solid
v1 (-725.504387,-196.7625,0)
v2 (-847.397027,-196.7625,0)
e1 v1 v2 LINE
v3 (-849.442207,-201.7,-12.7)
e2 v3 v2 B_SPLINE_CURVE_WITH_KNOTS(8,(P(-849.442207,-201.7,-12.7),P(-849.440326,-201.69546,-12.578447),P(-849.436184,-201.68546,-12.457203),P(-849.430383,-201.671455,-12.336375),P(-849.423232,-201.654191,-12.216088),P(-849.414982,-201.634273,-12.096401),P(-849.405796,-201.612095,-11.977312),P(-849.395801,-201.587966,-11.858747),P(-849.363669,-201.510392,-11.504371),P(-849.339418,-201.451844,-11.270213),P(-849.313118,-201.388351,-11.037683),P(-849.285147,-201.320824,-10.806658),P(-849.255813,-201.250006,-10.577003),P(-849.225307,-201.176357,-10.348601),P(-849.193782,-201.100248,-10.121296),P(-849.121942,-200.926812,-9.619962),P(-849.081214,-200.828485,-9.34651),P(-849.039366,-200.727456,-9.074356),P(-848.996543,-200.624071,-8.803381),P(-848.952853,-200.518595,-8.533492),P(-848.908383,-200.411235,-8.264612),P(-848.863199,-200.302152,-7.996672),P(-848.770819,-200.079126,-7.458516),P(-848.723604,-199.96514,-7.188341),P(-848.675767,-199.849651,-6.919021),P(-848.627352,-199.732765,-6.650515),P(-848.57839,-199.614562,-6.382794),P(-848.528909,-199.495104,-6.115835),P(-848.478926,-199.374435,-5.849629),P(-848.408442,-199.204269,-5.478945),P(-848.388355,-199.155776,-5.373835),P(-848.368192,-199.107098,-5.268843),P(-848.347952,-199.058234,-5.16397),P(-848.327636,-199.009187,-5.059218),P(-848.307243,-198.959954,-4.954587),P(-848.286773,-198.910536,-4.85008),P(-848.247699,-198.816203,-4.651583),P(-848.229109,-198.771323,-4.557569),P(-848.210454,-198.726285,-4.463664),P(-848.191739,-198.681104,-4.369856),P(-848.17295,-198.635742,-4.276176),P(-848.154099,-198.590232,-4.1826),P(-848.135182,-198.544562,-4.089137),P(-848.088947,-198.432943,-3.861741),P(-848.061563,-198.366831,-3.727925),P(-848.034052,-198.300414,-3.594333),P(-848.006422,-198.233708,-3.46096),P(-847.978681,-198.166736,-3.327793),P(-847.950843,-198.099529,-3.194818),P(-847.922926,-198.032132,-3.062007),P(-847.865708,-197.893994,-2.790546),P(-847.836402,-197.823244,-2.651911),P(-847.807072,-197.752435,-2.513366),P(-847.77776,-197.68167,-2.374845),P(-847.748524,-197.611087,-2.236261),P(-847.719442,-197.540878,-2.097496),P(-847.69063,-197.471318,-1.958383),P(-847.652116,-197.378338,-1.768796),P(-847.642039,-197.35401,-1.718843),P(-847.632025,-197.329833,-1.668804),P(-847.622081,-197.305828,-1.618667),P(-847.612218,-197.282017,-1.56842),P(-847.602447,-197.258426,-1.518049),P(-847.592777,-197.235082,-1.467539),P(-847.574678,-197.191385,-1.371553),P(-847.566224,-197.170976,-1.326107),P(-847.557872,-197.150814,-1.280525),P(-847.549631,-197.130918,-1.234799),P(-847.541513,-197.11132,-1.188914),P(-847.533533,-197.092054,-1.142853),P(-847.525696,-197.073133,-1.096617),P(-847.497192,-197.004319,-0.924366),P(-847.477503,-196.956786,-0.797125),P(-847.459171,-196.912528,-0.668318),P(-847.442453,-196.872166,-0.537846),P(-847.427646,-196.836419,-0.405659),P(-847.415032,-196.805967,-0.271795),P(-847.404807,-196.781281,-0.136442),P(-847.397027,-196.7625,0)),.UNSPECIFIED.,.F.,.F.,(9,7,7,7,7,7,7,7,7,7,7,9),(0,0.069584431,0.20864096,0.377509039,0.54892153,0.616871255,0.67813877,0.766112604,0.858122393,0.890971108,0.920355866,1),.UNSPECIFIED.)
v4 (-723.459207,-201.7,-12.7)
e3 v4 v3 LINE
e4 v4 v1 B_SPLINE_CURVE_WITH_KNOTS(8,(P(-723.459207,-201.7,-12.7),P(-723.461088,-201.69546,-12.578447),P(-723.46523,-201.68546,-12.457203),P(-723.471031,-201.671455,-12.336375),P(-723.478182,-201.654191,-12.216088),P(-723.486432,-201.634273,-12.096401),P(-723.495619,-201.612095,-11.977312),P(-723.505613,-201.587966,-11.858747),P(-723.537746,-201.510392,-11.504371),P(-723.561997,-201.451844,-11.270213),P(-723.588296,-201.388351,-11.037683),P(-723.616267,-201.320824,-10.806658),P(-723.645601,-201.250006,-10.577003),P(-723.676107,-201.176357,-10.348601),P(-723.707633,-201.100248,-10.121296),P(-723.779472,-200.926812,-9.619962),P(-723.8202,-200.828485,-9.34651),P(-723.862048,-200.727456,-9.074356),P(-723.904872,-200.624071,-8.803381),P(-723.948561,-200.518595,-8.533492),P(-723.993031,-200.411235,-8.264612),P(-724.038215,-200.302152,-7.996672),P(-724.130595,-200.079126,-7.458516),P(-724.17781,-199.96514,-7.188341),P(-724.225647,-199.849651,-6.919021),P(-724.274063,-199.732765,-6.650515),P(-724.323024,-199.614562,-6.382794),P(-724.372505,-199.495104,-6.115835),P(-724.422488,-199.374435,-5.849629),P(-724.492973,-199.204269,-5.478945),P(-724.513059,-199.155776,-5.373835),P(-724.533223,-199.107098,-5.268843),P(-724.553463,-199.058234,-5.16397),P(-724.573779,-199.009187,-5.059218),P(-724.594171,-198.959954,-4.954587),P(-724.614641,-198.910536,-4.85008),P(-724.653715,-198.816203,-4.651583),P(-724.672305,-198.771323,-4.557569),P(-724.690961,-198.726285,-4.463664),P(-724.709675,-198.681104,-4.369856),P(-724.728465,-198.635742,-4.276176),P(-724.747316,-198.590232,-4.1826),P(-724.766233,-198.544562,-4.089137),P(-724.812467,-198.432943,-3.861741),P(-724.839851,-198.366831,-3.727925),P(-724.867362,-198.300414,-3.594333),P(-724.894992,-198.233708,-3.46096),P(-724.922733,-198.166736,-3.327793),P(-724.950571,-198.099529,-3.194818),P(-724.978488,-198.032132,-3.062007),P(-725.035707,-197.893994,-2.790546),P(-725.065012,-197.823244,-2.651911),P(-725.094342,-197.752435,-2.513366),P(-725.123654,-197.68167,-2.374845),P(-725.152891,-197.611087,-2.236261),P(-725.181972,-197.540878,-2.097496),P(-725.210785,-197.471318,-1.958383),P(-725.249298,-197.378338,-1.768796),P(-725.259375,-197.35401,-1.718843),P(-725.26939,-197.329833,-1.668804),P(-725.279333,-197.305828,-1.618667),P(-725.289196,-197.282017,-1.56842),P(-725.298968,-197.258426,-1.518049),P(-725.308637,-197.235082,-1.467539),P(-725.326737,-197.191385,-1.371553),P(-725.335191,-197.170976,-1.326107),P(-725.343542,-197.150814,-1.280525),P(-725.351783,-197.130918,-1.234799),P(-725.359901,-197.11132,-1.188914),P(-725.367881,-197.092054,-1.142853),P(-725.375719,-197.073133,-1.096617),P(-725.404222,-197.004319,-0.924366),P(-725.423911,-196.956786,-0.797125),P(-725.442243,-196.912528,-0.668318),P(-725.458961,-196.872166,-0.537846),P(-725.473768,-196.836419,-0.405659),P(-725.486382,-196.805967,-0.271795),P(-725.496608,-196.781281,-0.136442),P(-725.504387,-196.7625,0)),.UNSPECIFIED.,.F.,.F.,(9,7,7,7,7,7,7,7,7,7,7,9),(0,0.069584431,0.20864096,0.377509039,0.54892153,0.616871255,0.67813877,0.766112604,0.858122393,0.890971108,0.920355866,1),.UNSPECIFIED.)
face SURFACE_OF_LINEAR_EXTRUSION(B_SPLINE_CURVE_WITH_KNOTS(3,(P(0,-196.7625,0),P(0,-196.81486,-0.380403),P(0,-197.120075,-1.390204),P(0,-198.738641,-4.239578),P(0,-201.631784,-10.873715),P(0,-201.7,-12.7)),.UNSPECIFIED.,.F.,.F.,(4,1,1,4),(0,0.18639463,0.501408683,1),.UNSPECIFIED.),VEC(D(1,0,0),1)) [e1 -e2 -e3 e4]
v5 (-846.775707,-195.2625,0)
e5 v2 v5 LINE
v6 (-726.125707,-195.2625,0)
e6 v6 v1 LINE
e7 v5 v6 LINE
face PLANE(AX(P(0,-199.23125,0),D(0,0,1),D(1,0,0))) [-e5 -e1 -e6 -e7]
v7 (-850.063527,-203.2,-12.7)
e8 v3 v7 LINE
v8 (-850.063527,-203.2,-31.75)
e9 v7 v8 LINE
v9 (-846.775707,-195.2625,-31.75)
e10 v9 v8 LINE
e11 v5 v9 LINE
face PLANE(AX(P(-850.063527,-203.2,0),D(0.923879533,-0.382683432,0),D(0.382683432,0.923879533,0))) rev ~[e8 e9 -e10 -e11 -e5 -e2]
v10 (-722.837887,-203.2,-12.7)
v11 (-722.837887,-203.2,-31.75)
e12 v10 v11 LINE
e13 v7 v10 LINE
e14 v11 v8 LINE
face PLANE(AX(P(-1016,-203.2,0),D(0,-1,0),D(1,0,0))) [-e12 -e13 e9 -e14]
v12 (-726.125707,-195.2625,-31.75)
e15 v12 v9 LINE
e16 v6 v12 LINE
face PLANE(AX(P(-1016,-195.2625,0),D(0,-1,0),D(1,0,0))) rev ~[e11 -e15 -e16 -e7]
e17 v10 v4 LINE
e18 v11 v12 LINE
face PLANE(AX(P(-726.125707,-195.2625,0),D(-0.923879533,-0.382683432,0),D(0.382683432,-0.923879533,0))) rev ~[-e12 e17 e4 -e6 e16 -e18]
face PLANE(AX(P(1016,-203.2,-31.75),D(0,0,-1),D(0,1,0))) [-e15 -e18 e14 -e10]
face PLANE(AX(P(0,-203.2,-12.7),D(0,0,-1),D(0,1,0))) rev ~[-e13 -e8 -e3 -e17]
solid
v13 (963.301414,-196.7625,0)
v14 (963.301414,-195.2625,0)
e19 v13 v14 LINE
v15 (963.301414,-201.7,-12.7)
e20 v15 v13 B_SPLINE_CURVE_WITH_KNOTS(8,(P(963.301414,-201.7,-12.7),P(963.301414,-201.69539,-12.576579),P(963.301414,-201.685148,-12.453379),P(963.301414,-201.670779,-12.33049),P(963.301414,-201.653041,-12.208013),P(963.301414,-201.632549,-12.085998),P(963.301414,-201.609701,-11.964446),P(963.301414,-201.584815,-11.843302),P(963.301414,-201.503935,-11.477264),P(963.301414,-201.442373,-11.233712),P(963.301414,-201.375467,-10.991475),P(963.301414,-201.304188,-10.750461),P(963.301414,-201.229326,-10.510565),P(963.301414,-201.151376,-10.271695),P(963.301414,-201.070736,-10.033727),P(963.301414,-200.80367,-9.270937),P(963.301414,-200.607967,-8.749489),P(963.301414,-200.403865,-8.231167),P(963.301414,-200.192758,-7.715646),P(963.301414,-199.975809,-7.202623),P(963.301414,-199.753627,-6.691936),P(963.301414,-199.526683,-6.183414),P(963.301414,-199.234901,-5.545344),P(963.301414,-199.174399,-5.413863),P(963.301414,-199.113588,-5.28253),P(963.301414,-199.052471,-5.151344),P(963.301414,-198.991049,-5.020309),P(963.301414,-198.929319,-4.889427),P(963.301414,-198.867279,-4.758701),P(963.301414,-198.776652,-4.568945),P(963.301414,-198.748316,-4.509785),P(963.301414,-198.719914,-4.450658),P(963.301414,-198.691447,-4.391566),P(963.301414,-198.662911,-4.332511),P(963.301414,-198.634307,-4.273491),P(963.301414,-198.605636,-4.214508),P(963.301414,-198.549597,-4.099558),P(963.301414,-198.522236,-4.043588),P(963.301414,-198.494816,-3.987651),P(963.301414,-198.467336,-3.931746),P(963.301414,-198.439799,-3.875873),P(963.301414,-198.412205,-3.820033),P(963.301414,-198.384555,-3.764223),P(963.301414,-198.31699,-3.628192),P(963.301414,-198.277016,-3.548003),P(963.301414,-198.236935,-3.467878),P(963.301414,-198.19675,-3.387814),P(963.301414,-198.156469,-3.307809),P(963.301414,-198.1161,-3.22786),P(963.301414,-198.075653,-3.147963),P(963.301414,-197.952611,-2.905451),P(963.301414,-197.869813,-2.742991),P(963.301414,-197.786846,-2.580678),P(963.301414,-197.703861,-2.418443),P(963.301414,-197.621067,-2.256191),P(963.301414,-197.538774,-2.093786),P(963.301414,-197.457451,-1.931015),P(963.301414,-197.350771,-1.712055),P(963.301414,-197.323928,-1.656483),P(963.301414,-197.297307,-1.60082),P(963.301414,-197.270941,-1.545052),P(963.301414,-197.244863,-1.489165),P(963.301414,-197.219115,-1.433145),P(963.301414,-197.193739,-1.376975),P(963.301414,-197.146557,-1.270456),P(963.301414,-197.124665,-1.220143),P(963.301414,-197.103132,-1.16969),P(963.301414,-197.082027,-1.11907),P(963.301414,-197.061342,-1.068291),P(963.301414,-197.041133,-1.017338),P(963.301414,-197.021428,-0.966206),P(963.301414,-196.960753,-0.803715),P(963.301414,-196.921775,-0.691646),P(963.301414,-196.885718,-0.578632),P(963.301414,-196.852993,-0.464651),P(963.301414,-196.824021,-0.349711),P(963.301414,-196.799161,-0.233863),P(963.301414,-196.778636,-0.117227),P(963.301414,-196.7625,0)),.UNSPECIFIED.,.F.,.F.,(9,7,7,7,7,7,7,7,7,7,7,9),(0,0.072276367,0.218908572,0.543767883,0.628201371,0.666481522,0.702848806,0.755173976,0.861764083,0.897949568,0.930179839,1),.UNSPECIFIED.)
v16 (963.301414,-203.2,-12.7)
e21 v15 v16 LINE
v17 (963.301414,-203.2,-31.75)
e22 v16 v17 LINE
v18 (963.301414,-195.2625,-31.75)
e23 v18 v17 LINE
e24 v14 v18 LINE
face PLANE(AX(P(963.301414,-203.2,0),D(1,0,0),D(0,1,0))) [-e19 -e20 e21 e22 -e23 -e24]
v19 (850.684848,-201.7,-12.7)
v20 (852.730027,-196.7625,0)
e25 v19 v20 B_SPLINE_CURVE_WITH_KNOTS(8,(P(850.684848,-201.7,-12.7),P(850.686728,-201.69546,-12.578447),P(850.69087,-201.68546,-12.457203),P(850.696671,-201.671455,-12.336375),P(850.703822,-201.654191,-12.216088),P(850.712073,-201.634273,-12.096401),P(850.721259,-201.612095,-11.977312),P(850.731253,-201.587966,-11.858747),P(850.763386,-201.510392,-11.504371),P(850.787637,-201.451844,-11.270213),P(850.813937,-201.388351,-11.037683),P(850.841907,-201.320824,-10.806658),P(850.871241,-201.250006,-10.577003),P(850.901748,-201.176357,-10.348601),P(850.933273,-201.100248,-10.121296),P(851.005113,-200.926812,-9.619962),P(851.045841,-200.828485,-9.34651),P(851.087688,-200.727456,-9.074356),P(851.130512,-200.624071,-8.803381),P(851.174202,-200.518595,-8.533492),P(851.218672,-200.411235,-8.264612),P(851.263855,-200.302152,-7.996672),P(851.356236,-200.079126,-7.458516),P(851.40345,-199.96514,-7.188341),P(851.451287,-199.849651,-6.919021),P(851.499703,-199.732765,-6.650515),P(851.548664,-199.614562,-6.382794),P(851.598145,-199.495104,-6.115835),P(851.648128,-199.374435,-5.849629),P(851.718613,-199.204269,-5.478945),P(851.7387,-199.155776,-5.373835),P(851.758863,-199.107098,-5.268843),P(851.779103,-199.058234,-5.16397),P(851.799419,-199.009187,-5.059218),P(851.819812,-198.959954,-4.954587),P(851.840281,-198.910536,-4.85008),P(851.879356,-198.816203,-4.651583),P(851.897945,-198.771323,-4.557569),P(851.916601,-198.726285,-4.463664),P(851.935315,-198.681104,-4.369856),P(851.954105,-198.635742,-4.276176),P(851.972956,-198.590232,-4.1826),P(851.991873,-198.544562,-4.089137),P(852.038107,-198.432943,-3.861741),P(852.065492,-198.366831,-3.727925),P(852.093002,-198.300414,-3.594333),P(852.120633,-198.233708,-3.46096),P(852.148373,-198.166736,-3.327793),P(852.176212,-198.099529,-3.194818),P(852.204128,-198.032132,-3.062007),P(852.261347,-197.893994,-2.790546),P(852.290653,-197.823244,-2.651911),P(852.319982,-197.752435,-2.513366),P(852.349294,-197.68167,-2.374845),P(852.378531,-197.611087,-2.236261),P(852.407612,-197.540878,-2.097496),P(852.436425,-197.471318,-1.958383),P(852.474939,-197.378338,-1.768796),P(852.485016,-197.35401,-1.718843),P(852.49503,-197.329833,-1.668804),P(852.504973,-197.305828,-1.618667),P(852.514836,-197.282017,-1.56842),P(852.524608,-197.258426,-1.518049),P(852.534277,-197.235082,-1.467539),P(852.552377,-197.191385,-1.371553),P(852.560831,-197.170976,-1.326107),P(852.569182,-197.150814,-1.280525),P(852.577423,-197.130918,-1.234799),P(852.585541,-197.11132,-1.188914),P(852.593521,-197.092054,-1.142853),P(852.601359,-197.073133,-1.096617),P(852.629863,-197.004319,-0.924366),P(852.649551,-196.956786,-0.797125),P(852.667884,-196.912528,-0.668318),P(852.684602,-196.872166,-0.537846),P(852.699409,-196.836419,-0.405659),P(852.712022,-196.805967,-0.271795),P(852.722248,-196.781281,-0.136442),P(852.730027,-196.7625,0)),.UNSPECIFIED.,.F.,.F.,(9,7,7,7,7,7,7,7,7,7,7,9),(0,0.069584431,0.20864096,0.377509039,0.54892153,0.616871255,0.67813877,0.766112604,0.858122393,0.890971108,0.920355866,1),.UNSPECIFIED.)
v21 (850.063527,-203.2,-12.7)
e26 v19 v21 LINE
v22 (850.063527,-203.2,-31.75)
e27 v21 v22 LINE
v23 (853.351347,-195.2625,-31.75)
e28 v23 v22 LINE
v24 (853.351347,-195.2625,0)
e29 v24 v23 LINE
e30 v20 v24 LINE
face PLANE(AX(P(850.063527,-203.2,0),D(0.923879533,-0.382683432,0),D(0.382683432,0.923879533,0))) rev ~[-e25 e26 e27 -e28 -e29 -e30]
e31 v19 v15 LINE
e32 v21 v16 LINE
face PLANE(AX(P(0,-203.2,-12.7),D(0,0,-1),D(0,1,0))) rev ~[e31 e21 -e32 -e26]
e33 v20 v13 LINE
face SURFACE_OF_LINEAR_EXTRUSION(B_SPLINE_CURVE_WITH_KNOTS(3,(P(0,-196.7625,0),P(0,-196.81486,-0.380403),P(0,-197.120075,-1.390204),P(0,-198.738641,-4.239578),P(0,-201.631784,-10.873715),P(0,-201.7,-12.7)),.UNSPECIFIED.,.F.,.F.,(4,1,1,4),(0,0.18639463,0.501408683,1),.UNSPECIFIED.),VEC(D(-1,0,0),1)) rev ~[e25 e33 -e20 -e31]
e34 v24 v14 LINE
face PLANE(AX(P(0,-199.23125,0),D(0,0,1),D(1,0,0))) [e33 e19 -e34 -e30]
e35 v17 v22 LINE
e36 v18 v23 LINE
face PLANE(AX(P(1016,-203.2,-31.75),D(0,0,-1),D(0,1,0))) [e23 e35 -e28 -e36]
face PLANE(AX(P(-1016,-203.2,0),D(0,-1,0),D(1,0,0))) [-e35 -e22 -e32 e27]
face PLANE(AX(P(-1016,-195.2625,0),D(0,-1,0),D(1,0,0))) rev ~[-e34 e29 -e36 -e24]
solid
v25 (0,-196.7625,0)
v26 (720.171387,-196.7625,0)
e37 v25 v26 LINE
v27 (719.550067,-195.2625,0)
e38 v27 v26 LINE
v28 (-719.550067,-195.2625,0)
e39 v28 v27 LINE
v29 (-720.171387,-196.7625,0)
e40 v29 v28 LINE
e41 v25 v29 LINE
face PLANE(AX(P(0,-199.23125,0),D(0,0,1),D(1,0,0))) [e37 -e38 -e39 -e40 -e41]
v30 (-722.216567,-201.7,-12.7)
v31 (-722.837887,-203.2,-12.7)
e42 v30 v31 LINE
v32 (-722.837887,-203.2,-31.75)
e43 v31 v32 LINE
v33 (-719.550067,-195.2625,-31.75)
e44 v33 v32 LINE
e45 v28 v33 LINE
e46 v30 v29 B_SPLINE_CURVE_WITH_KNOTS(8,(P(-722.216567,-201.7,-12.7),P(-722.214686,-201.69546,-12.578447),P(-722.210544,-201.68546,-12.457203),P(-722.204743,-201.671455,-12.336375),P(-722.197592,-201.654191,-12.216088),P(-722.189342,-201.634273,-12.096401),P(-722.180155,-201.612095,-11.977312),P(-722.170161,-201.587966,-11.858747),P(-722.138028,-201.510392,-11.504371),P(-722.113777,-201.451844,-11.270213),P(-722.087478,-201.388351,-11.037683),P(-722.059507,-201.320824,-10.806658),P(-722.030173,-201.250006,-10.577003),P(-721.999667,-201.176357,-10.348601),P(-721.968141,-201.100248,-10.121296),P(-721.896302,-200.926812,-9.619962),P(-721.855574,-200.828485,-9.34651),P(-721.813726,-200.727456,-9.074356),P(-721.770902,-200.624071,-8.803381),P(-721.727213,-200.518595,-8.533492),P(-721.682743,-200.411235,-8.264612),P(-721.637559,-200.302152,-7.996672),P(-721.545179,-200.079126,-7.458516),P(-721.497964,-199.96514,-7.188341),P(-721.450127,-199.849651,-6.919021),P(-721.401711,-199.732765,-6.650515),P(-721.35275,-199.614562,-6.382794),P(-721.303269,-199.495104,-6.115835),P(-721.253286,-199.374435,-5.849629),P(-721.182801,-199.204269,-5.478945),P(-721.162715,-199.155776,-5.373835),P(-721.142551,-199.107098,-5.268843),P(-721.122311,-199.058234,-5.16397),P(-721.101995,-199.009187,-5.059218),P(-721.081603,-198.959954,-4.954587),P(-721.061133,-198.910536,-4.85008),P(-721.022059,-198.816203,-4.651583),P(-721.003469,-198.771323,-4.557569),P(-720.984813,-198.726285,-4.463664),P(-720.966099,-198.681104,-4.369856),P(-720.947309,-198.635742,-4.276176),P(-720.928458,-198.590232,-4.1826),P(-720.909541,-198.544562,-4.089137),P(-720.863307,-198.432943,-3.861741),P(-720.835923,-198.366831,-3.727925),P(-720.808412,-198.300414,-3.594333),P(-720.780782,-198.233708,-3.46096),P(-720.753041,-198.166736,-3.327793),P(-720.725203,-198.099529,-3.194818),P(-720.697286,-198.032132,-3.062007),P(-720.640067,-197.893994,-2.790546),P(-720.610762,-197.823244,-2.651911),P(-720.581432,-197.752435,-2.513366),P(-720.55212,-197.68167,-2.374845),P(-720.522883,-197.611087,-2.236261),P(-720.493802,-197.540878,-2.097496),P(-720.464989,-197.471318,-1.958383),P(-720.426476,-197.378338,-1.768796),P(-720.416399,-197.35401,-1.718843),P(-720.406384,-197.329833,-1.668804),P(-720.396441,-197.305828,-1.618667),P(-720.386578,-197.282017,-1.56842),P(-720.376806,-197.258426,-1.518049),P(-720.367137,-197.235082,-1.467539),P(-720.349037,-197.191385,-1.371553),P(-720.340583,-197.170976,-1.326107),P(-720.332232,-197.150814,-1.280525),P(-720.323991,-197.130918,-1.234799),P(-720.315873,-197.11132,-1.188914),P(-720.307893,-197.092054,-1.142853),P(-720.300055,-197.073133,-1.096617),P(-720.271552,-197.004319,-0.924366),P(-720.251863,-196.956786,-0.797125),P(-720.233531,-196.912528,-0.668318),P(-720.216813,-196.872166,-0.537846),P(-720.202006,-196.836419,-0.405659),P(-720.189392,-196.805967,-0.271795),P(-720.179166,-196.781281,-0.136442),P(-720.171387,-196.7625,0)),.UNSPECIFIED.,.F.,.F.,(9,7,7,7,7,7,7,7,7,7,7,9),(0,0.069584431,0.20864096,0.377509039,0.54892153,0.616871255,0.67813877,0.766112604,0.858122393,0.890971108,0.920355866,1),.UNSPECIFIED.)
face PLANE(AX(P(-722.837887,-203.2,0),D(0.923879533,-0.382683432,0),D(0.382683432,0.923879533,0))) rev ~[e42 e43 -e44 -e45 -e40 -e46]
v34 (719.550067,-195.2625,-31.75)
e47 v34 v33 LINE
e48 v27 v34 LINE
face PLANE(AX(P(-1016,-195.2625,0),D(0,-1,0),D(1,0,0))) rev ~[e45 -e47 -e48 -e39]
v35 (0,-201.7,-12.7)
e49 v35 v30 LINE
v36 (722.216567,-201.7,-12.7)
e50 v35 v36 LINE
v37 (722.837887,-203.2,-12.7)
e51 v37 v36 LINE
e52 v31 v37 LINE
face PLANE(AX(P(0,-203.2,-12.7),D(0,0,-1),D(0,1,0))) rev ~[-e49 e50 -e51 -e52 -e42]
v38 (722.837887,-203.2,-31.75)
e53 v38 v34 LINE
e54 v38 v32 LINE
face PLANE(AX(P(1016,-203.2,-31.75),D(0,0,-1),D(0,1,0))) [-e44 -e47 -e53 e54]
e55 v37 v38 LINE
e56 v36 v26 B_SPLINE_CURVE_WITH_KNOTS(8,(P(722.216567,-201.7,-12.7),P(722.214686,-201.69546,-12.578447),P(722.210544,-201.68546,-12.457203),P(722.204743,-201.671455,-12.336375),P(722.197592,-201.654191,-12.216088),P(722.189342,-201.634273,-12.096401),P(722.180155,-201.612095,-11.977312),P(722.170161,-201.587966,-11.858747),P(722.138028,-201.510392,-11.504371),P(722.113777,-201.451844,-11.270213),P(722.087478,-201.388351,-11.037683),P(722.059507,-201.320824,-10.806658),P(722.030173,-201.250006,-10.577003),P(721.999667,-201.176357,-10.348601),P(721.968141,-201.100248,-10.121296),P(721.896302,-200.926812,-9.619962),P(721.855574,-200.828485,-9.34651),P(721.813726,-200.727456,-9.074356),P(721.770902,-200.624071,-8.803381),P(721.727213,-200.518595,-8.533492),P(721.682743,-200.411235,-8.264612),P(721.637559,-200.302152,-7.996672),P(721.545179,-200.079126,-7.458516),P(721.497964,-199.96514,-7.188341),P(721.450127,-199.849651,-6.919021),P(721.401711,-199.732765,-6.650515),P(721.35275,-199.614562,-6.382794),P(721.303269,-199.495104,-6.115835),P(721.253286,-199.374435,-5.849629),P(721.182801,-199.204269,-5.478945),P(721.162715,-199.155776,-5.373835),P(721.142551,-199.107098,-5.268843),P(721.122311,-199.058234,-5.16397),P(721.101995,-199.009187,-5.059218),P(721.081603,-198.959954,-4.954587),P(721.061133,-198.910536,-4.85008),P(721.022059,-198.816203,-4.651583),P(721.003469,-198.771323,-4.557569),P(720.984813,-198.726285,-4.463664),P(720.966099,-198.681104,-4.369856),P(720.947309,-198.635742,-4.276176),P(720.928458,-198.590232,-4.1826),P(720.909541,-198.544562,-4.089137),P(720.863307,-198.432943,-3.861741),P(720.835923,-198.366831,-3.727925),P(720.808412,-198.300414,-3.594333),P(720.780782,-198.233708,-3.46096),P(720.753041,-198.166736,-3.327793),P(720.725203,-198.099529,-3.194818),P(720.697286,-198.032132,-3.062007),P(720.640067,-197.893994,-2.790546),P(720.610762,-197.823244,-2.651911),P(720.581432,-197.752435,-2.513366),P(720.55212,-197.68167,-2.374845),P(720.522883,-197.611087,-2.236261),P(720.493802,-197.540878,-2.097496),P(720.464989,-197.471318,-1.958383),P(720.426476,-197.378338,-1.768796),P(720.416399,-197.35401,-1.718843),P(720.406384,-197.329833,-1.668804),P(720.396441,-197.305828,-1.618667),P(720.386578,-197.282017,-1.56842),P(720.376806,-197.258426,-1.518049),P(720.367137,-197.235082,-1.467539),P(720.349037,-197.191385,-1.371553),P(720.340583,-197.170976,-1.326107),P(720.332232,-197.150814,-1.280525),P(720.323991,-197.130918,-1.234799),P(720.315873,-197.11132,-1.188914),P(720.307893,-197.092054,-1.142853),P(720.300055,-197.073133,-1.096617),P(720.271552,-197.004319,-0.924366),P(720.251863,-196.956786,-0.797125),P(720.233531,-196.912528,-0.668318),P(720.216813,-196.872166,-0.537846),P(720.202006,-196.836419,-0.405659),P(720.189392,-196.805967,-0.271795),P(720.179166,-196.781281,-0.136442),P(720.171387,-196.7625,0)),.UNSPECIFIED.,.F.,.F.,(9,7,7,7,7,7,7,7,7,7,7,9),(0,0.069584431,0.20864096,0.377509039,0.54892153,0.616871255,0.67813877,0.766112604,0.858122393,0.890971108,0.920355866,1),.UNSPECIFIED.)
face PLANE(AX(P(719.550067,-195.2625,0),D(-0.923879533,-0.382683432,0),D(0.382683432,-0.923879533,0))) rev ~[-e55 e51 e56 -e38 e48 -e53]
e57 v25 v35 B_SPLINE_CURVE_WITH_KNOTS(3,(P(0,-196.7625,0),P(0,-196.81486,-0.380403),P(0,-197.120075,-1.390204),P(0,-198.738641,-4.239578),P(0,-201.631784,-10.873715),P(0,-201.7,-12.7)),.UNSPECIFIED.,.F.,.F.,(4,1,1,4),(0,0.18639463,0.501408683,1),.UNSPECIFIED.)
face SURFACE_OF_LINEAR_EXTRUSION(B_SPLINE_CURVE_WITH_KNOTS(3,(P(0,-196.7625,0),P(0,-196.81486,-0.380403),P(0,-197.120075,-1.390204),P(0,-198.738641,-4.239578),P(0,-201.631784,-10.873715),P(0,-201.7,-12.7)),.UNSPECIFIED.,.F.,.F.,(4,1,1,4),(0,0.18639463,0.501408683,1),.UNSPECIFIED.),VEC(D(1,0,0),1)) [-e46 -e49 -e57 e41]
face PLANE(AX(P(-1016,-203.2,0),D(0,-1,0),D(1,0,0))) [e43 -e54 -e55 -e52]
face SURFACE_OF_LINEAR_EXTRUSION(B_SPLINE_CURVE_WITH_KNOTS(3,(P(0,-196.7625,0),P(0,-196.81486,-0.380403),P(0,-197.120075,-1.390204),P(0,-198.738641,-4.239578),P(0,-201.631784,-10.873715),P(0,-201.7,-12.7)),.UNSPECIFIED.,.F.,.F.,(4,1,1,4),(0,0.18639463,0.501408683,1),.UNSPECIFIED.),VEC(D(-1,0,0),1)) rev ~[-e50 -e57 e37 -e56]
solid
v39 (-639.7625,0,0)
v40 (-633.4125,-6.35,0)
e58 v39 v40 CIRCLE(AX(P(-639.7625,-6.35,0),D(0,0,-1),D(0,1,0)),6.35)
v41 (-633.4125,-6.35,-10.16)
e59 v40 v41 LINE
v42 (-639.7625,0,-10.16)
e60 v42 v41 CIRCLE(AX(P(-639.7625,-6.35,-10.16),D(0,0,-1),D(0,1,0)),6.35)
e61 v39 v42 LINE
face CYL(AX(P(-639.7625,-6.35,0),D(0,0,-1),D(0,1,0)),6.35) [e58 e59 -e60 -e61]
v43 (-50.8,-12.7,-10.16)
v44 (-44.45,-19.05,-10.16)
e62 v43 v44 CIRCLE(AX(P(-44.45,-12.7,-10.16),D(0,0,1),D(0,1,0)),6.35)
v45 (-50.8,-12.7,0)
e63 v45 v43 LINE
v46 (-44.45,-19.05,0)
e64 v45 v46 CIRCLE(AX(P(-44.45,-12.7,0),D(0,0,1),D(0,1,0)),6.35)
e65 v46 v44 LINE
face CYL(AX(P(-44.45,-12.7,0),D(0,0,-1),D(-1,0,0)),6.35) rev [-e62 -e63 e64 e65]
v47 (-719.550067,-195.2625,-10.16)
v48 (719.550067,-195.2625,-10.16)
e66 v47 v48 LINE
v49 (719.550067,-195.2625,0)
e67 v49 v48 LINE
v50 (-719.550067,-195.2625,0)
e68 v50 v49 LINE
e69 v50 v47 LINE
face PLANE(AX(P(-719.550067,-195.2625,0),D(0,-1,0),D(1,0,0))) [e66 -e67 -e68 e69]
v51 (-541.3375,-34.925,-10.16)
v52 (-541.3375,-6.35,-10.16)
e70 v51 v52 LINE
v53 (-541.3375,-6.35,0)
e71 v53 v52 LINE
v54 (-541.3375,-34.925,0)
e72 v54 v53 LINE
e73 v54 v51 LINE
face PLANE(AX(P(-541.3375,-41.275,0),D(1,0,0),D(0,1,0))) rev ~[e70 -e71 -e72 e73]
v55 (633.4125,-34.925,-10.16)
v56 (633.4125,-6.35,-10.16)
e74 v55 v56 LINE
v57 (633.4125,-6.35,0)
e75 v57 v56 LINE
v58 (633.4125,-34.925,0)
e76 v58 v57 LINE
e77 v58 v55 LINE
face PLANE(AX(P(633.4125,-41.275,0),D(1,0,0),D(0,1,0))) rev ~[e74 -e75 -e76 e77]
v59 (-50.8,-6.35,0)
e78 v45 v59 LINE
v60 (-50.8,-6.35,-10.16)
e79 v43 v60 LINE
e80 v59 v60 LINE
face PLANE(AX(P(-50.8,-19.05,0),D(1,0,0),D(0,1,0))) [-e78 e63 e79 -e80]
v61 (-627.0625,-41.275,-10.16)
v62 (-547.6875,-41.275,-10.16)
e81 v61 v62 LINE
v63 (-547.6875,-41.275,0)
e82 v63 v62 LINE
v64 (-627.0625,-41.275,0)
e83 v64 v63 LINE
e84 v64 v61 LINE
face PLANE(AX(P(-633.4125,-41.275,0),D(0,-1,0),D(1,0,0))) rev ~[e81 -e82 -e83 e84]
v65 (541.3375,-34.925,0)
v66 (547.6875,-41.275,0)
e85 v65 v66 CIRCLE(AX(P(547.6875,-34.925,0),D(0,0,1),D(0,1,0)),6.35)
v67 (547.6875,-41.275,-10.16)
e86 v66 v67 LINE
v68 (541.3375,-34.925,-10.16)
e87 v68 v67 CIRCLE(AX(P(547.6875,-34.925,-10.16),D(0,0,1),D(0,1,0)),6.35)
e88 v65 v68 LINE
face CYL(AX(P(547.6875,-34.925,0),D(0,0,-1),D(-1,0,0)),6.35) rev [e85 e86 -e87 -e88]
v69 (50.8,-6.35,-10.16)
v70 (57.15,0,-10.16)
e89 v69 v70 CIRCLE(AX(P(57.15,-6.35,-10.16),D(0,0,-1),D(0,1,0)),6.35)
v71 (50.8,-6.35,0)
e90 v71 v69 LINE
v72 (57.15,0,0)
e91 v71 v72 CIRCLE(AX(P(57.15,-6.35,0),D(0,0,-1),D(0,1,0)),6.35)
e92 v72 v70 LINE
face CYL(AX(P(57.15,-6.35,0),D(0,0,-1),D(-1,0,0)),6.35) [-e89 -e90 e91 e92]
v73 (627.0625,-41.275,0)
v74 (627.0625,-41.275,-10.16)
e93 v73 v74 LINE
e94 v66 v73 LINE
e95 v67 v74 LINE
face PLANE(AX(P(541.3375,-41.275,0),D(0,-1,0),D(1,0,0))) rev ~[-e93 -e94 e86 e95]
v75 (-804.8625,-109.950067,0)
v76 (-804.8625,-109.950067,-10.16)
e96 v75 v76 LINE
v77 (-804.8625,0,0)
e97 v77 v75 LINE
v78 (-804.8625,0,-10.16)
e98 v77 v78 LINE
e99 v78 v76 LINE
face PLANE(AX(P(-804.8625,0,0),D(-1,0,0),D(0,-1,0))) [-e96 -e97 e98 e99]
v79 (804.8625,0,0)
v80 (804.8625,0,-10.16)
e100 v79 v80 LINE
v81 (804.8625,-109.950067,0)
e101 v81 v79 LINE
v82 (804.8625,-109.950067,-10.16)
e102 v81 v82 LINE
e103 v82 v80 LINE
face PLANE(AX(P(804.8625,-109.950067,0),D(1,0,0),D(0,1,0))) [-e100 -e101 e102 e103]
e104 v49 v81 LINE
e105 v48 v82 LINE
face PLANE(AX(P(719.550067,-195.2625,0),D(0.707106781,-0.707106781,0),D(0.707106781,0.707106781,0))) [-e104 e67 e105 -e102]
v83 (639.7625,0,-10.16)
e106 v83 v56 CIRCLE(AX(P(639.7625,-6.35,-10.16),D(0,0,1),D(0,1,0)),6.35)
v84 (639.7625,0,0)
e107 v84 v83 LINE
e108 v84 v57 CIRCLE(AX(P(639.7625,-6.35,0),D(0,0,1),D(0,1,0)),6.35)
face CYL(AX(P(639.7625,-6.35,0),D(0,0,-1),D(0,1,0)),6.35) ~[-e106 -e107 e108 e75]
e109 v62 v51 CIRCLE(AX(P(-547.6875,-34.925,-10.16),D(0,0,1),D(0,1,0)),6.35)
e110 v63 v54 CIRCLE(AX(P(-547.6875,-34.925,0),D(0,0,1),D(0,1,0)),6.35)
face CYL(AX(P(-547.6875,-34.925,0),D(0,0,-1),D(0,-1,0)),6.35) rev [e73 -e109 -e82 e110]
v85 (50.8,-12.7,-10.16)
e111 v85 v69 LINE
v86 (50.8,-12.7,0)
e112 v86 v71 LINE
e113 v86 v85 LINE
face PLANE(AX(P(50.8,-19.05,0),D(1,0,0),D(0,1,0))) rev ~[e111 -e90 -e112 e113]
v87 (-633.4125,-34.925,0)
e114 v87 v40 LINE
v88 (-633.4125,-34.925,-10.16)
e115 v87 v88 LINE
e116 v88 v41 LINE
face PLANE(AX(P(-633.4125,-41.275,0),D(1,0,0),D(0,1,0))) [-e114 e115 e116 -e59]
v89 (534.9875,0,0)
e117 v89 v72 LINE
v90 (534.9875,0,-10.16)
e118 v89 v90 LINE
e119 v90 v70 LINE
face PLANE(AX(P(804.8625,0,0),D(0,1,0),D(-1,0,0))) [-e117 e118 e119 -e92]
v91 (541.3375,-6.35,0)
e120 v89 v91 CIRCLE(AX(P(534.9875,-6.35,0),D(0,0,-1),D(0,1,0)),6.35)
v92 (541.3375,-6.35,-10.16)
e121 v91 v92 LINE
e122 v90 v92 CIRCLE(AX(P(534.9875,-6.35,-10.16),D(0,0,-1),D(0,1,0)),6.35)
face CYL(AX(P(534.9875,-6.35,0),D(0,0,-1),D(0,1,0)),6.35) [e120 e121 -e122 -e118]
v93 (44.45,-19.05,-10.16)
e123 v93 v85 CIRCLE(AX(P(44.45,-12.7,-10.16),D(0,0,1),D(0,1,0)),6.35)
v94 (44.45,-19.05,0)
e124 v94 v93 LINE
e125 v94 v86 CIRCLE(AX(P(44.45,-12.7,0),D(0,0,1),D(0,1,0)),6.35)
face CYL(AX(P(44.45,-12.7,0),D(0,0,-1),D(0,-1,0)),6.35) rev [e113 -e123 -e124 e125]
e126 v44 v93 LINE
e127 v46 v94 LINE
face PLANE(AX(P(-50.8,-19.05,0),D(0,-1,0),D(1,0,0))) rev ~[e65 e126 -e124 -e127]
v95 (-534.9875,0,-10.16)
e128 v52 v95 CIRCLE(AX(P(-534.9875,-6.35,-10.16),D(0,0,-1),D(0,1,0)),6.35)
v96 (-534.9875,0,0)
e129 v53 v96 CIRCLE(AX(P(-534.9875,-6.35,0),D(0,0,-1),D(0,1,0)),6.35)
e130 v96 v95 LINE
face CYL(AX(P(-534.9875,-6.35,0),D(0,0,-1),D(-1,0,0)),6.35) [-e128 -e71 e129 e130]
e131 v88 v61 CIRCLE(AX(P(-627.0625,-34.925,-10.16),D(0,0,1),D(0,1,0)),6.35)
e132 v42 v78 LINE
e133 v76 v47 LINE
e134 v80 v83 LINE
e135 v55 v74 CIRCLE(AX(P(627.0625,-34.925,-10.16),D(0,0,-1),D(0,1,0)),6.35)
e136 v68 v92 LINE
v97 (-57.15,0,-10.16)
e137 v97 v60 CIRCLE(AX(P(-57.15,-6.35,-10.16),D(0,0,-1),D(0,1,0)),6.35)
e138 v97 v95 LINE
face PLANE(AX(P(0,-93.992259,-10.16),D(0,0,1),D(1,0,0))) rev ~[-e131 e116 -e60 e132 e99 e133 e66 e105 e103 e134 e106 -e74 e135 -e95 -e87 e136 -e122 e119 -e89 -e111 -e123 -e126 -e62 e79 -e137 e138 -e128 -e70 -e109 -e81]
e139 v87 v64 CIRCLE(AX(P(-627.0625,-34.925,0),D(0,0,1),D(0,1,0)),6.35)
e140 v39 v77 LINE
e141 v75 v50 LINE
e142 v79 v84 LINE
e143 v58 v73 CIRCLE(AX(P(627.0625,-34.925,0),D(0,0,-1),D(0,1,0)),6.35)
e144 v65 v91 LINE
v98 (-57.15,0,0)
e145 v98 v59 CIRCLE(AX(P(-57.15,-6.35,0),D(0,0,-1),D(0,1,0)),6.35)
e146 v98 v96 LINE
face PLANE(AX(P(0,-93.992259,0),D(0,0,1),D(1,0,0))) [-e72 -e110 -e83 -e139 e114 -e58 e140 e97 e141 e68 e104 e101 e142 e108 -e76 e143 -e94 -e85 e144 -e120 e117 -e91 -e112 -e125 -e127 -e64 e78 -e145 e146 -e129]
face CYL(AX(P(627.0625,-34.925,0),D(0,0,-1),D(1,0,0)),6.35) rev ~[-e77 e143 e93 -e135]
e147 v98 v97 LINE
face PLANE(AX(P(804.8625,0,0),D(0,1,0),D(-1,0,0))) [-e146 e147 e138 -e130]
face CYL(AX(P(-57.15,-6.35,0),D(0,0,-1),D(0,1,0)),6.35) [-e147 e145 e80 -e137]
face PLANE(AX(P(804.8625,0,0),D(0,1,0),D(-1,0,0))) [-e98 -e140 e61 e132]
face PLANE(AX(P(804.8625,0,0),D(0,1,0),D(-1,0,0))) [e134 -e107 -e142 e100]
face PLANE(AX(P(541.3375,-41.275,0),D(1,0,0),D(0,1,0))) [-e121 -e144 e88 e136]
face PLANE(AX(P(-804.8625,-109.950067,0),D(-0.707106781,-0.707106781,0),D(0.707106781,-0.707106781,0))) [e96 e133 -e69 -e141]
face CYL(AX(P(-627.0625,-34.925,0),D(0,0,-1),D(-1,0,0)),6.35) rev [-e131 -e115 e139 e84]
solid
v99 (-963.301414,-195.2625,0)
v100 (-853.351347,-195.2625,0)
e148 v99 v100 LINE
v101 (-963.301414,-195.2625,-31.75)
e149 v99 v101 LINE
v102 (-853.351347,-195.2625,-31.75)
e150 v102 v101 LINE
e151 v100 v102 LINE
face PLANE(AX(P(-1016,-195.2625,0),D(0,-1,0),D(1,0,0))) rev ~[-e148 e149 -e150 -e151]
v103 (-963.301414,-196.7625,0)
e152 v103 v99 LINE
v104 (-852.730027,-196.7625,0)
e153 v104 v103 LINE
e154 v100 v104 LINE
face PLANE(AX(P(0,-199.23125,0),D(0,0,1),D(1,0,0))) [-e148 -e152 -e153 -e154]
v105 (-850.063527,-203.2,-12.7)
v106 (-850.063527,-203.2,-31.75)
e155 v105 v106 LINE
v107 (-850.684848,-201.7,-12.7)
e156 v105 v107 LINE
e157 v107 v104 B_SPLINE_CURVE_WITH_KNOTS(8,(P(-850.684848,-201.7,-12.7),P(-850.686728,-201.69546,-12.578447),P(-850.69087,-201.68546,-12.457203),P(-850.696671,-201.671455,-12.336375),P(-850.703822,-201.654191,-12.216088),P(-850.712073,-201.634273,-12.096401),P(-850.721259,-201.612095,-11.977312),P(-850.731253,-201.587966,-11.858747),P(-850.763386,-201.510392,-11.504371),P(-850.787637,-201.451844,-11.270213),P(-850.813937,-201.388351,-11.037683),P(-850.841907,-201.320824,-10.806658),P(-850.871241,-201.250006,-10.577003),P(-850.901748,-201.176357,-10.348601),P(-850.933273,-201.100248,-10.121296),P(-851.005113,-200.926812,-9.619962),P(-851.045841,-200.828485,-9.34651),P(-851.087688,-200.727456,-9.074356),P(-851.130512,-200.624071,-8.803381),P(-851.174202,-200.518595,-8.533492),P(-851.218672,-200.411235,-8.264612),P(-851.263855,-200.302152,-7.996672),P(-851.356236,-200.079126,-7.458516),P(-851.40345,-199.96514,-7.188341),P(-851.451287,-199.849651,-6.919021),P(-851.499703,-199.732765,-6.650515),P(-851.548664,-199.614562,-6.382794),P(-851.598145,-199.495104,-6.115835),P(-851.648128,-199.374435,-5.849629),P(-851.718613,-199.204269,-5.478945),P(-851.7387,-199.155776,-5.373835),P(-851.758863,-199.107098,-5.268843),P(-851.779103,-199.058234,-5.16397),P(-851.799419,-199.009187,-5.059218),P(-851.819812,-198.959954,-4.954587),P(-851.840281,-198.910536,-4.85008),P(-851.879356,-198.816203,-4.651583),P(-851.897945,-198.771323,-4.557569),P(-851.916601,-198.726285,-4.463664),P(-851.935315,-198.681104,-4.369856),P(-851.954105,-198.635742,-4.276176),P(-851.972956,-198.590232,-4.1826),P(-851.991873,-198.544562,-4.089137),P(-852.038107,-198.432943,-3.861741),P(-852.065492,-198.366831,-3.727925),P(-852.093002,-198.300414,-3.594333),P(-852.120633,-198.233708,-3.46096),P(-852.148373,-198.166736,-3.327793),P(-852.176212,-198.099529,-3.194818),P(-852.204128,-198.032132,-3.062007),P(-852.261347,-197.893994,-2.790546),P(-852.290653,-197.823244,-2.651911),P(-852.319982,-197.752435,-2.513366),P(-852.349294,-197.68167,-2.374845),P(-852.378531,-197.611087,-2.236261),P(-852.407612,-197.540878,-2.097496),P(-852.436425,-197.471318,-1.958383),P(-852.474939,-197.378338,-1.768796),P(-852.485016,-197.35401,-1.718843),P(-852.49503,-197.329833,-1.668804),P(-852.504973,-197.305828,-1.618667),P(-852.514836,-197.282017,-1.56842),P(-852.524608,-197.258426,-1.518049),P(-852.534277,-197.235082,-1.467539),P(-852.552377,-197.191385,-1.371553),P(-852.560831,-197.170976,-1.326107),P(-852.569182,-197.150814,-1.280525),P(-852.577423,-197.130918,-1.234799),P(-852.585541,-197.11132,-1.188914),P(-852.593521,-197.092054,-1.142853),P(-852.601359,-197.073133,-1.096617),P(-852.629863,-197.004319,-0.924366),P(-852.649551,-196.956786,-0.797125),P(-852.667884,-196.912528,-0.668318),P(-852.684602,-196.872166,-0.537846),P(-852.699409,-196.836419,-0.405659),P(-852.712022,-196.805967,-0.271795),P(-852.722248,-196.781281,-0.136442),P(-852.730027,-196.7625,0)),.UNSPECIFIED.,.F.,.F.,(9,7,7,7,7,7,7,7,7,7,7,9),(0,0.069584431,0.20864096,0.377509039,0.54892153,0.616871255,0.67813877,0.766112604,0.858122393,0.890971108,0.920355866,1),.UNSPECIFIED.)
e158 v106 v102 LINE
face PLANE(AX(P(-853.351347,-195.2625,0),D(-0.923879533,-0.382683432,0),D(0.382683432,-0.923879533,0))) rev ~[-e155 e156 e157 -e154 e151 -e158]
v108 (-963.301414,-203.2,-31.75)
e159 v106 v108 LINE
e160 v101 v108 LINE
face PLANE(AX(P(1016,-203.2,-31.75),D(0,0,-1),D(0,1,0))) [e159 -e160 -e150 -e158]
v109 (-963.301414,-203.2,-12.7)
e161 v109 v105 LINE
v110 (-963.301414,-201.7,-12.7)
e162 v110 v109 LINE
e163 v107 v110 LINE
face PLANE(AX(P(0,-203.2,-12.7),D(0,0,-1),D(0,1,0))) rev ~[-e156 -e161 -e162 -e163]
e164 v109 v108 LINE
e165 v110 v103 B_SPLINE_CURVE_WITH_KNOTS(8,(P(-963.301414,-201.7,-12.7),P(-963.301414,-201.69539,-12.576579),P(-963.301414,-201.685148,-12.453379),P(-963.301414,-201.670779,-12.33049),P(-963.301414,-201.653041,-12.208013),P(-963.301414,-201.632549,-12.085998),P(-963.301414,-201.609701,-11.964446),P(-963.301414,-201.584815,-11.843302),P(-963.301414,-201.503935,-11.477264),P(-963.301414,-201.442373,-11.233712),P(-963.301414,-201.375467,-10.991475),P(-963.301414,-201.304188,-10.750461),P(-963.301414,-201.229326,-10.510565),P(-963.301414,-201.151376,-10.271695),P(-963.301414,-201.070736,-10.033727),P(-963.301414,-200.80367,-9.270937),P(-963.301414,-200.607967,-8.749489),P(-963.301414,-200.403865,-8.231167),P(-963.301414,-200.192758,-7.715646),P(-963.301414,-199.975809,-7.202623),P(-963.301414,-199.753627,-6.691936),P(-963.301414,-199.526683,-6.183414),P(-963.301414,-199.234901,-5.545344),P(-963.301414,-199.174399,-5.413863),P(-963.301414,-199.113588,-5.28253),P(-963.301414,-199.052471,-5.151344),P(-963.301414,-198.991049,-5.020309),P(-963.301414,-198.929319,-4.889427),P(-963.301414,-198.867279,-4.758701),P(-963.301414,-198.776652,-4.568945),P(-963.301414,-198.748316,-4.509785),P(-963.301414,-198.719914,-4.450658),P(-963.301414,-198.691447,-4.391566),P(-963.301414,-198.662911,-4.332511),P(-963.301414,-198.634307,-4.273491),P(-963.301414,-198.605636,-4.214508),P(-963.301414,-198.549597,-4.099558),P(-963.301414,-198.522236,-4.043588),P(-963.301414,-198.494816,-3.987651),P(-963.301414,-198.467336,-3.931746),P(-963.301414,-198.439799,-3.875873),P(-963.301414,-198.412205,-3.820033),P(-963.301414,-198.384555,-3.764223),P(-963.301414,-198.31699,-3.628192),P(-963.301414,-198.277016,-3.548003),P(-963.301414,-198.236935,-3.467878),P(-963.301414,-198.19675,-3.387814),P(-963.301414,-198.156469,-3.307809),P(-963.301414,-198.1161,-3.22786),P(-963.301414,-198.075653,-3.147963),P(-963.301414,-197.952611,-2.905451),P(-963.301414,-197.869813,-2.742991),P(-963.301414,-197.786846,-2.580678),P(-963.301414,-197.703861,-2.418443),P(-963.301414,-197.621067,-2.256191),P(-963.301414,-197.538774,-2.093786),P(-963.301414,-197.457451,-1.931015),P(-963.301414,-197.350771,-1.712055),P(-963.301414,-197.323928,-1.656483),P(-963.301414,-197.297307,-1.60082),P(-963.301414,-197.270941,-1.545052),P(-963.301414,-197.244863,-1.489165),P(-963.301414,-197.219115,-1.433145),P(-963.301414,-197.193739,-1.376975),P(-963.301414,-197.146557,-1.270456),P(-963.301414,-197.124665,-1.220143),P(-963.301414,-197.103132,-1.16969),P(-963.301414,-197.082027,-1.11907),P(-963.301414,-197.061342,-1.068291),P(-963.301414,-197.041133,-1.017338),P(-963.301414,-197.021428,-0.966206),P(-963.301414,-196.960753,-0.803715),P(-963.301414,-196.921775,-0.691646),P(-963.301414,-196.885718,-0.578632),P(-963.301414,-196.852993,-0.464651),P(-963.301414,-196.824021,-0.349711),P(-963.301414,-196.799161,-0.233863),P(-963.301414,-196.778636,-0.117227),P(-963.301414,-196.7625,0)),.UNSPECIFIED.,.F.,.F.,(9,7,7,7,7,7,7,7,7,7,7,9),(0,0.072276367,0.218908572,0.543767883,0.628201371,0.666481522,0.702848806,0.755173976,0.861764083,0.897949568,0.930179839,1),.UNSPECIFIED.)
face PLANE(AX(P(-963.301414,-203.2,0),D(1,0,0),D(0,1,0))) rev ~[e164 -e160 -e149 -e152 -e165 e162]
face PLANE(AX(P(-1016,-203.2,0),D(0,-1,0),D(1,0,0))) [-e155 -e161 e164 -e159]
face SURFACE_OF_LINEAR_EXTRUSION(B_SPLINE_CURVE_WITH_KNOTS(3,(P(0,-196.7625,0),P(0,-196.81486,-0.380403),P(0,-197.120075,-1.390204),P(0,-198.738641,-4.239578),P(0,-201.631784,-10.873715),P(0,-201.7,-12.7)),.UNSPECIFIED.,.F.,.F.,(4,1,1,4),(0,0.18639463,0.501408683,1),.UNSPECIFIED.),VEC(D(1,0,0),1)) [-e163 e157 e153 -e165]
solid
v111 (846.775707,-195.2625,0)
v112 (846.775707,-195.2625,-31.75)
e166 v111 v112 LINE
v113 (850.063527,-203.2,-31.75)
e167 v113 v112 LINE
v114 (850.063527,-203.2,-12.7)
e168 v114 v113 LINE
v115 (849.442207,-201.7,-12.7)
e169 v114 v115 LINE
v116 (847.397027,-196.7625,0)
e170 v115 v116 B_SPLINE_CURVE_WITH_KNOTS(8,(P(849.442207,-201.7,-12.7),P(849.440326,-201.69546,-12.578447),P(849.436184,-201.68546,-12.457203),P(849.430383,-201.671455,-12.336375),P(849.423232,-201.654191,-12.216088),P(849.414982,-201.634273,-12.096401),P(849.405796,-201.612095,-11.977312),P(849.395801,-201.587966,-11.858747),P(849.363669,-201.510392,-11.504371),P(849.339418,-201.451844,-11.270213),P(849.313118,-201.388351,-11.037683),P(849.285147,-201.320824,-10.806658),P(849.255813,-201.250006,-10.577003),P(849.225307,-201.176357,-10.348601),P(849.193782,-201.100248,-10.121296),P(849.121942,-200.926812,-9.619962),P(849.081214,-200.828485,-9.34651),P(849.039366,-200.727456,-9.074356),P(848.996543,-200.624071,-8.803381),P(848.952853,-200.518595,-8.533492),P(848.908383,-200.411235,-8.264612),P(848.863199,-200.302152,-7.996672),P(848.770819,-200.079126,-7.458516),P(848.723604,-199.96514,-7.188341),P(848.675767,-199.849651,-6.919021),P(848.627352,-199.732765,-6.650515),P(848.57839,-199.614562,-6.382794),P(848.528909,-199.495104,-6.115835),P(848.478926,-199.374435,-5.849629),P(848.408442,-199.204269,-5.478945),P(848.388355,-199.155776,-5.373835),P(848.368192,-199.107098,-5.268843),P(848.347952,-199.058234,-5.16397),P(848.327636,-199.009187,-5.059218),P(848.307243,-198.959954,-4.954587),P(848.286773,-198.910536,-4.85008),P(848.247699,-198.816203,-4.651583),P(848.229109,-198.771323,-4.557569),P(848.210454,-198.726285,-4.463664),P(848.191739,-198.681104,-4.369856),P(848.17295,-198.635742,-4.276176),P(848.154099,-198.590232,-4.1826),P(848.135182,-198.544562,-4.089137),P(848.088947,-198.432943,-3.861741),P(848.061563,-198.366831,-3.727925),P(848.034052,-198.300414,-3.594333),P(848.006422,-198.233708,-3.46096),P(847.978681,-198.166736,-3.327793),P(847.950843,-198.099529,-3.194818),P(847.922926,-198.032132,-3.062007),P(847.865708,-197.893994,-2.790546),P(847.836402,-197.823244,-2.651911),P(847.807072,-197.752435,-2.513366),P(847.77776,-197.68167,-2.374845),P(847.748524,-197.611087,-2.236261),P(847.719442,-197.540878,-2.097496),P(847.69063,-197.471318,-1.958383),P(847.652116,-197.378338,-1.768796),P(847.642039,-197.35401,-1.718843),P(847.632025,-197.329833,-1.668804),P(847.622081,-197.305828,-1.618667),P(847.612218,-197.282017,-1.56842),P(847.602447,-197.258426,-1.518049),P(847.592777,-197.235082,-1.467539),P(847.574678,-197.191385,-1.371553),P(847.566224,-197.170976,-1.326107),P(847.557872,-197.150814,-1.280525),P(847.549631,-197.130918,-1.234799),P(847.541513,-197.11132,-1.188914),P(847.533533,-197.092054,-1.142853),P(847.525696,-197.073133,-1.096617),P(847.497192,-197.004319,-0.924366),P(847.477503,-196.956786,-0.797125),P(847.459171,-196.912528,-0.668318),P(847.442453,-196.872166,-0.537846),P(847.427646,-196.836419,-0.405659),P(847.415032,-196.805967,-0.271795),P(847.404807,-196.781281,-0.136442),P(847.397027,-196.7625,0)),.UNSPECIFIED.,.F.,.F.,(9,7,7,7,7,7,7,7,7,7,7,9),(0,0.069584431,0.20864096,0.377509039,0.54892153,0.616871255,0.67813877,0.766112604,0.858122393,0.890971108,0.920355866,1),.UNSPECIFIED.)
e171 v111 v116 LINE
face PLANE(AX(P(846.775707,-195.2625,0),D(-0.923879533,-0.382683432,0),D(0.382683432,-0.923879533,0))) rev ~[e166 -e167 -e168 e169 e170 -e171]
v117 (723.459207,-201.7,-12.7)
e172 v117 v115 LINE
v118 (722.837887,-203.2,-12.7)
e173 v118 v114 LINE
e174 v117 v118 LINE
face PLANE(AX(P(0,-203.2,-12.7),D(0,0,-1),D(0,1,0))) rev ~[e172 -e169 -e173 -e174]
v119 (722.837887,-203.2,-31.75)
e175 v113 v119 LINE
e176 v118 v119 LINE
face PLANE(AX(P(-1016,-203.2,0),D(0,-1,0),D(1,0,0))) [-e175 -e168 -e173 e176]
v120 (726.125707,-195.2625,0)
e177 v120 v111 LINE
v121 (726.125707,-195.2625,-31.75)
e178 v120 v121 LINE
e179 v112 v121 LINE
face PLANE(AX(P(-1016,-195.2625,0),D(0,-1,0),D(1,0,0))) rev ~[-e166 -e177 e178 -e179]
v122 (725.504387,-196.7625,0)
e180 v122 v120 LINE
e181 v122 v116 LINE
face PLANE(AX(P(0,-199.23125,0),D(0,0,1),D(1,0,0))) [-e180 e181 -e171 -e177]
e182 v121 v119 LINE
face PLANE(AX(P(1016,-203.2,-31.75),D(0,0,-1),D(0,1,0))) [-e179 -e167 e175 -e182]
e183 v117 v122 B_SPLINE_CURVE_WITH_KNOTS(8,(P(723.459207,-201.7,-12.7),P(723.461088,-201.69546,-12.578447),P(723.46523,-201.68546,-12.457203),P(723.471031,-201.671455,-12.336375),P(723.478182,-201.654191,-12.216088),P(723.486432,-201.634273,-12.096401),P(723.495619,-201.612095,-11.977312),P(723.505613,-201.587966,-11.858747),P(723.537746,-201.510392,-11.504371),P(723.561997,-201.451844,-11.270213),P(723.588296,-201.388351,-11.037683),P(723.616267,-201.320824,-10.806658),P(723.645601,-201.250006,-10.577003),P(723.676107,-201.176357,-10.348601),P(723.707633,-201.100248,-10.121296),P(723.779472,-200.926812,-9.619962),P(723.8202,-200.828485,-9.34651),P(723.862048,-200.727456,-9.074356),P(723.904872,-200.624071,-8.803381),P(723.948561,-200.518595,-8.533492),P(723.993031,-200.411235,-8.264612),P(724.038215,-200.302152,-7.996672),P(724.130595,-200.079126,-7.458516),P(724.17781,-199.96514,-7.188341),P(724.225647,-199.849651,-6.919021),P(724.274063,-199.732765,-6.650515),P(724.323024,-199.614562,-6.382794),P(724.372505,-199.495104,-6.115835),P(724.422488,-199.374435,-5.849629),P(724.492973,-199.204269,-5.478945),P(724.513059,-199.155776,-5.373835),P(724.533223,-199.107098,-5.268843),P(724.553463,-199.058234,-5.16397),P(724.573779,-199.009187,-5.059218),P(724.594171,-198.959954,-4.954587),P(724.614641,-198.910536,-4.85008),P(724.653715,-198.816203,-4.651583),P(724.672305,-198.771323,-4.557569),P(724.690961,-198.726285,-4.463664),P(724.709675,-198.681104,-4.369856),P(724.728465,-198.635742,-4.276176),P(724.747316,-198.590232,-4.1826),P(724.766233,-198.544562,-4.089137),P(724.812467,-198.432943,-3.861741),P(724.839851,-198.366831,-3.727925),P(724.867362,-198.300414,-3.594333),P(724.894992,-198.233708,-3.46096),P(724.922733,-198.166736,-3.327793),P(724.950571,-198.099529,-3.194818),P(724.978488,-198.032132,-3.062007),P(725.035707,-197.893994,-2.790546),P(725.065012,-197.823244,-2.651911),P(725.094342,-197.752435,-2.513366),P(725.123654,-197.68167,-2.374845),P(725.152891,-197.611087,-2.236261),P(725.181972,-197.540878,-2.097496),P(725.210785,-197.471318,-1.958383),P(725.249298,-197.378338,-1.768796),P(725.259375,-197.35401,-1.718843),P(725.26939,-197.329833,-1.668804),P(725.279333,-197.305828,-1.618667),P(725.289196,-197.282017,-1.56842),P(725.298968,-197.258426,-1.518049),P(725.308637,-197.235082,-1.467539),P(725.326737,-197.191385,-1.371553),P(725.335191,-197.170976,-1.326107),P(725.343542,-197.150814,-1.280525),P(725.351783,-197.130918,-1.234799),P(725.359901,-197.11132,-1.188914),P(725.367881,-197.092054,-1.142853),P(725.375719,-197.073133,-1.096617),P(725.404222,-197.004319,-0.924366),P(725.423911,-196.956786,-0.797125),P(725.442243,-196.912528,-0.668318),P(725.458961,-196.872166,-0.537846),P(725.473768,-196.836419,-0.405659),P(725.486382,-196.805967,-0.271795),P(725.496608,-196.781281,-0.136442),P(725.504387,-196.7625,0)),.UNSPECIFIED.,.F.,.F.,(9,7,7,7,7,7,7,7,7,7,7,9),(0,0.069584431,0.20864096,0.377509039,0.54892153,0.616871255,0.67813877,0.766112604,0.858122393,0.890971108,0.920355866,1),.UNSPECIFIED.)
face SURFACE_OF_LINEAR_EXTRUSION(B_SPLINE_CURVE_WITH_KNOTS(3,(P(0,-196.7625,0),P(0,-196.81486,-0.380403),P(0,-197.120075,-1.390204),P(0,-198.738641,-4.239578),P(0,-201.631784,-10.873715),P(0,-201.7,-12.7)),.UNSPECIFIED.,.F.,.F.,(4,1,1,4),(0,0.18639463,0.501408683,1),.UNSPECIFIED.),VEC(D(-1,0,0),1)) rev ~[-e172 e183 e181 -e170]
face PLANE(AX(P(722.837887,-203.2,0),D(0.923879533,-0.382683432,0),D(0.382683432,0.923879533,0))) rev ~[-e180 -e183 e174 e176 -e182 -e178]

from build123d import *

# Parameters (mm, degrees)
F3_DEPTH      = 10.16
F4_W          = 2032
F4_H          = 7.9375
F5_DEPTH      = 57.15
F7_DEPTH      = 1016.001
F7_DEPTH_BACK = 1016.001
F8_W          = 7.9375
F8_H          = 25.4
F9_DEPTH      = 2032.0010001
F10_W         = 52.698585695
F10_H         = 7.9375
F11_DEPTH     = 31.7510001
F12_W         = 92.075
F12_H         = 41.275
F12_W_2       = 101.6
F12_H_2       = 19.05
F13_DEPTH     = 31.7510001
F14_R         = 6.35


# Not quite as in the source:
# - a variable given as a bare number and used for a length is read in inches; the dataset says mm whatever the document's units were


with BuildPart() as f3:
    # F2 (on Top) → F3 (new body)
    with BuildSketch(Plane.XY):
        Polygon((804.8625, 0), (-804.8625, 0), (-804.8625, -109.9500668498), (-719.5500668498, -195.2625), (719.5500668498, -195.2625), (804.8625, -109.9500668498), align=None)
    extrude(amount=-F3_DEPTH)

    # F12 (on face) → F13 (cut, through all)
    with BuildSketch(Plane.XY):
        with Locations((-587.375, -20.6375)):
            Rectangle(F12_W, F12_H)
        with Locations((0, -9.525)):
            Rectangle(F12_W_2, F12_H_2)
        with Locations((587.375, -20.6375)):
            Rectangle(F12_W, F12_H)
    extrude(amount=-F13_DEPTH, mode=Mode.SUBTRACT)

    # F14
    f14_edges = [f3.edges().sort_by_distance(p)[0] for p in [
        (-633.4125, 0, -5.08),
        (-633.4125, -41.275, -5.08),
        (-541.3375, -41.275, -5.08),
        (-541.3375, 0, -5.08),
        (-50.8, -19.05, -5.08),
        (-50.8, 0, -5.08),
        (50.8, 0, -5.08),
        (50.8, -19.05, -5.08),
        (633.4125, -41.275, -5.08),
        (633.4125, 0, -5.08),
        (541.3375, -41.275, -5.08),
        (541.3375, 0, -5.08),
    ]]
    fillet(f14_edges, radius=F14_R)


with BuildPart() as f5:
    # F4 (on face) → F5 (new body)
    with BuildSketch(Plane.XY):
        with Locations((0, -199.23125)):
            Rectangle(F4_W, F4_H)
    extrude(amount=-F5_DEPTH)

    # F6 (on Right) → F7 (cut, two sides)
    with BuildSketch(Plane.YZ) as f7_sk:
        with BuildLine():
            Line((-203.2, -12.7), (-201.7, -12.7))
            add(Edge.make_bspline(
                [(-196.7625, 0), (-196.8148604761, -0.3804030605), (-197.1200745243, -1.3902041101), (-198.7386405945, -4.2395784301), (-201.6317836716, -10.8737146377), (-201.7, -12.7)],
                knots=[0, 0, 0, 0, 0.1863946303, 0.5014086831, 1, 1, 1, 1], degree=3))
            Line((-196.7625, 0), (-203.2, 0))
            Line((-203.2, 0), (-203.2, -12.7))
        make_face()
    extrude(amount=-F7_DEPTH, mode=Mode.SUBTRACT)
    extrude(f7_sk.sketch, amount=F7_DEPTH_BACK, mode=Mode.SUBTRACT)

    # F8 (on face) → F9 (cut, through all)
    with BuildSketch(Plane.YZ.offset(1016)):
        with Locations((-199.23125, -44.45)):
            Rectangle(F8_W, F8_H)
    extrude(amount=-F9_DEPTH, mode=Mode.SUBTRACT)

    # F10 (on face) → F11 (cut, through all)
    with BuildSketch(Plane.XY):
        Polygon((-722.8378870012, -203.2), (-719.5500668498, -195.2625), (-726.1257071525, -195.2625), align=None)
        Polygon((-850.0635273039, -203.2), (-846.7757071525, -195.2625), (-853.3513474552, -195.2625), align=None)
        Polygon((726.1257071525, -195.2625), (719.5500668498, -195.2625), (722.8378870012, -203.2), align=None)
        Polygon((853.3513474552, -195.2625), (846.7757071525, -195.2625), (850.0635273039, -203.2), align=None)
        with Locations((-989.6507071525, -199.23125)):
            Rectangle(F10_W, F10_H)
        with Locations((989.6507071525, -199.23125)):
            Rectangle(F10_W, F10_H)
    extrude(amount=-F11_DEPTH, mode=Mode.SUBTRACT)


solid = Compound([f3.part, f5.part])
